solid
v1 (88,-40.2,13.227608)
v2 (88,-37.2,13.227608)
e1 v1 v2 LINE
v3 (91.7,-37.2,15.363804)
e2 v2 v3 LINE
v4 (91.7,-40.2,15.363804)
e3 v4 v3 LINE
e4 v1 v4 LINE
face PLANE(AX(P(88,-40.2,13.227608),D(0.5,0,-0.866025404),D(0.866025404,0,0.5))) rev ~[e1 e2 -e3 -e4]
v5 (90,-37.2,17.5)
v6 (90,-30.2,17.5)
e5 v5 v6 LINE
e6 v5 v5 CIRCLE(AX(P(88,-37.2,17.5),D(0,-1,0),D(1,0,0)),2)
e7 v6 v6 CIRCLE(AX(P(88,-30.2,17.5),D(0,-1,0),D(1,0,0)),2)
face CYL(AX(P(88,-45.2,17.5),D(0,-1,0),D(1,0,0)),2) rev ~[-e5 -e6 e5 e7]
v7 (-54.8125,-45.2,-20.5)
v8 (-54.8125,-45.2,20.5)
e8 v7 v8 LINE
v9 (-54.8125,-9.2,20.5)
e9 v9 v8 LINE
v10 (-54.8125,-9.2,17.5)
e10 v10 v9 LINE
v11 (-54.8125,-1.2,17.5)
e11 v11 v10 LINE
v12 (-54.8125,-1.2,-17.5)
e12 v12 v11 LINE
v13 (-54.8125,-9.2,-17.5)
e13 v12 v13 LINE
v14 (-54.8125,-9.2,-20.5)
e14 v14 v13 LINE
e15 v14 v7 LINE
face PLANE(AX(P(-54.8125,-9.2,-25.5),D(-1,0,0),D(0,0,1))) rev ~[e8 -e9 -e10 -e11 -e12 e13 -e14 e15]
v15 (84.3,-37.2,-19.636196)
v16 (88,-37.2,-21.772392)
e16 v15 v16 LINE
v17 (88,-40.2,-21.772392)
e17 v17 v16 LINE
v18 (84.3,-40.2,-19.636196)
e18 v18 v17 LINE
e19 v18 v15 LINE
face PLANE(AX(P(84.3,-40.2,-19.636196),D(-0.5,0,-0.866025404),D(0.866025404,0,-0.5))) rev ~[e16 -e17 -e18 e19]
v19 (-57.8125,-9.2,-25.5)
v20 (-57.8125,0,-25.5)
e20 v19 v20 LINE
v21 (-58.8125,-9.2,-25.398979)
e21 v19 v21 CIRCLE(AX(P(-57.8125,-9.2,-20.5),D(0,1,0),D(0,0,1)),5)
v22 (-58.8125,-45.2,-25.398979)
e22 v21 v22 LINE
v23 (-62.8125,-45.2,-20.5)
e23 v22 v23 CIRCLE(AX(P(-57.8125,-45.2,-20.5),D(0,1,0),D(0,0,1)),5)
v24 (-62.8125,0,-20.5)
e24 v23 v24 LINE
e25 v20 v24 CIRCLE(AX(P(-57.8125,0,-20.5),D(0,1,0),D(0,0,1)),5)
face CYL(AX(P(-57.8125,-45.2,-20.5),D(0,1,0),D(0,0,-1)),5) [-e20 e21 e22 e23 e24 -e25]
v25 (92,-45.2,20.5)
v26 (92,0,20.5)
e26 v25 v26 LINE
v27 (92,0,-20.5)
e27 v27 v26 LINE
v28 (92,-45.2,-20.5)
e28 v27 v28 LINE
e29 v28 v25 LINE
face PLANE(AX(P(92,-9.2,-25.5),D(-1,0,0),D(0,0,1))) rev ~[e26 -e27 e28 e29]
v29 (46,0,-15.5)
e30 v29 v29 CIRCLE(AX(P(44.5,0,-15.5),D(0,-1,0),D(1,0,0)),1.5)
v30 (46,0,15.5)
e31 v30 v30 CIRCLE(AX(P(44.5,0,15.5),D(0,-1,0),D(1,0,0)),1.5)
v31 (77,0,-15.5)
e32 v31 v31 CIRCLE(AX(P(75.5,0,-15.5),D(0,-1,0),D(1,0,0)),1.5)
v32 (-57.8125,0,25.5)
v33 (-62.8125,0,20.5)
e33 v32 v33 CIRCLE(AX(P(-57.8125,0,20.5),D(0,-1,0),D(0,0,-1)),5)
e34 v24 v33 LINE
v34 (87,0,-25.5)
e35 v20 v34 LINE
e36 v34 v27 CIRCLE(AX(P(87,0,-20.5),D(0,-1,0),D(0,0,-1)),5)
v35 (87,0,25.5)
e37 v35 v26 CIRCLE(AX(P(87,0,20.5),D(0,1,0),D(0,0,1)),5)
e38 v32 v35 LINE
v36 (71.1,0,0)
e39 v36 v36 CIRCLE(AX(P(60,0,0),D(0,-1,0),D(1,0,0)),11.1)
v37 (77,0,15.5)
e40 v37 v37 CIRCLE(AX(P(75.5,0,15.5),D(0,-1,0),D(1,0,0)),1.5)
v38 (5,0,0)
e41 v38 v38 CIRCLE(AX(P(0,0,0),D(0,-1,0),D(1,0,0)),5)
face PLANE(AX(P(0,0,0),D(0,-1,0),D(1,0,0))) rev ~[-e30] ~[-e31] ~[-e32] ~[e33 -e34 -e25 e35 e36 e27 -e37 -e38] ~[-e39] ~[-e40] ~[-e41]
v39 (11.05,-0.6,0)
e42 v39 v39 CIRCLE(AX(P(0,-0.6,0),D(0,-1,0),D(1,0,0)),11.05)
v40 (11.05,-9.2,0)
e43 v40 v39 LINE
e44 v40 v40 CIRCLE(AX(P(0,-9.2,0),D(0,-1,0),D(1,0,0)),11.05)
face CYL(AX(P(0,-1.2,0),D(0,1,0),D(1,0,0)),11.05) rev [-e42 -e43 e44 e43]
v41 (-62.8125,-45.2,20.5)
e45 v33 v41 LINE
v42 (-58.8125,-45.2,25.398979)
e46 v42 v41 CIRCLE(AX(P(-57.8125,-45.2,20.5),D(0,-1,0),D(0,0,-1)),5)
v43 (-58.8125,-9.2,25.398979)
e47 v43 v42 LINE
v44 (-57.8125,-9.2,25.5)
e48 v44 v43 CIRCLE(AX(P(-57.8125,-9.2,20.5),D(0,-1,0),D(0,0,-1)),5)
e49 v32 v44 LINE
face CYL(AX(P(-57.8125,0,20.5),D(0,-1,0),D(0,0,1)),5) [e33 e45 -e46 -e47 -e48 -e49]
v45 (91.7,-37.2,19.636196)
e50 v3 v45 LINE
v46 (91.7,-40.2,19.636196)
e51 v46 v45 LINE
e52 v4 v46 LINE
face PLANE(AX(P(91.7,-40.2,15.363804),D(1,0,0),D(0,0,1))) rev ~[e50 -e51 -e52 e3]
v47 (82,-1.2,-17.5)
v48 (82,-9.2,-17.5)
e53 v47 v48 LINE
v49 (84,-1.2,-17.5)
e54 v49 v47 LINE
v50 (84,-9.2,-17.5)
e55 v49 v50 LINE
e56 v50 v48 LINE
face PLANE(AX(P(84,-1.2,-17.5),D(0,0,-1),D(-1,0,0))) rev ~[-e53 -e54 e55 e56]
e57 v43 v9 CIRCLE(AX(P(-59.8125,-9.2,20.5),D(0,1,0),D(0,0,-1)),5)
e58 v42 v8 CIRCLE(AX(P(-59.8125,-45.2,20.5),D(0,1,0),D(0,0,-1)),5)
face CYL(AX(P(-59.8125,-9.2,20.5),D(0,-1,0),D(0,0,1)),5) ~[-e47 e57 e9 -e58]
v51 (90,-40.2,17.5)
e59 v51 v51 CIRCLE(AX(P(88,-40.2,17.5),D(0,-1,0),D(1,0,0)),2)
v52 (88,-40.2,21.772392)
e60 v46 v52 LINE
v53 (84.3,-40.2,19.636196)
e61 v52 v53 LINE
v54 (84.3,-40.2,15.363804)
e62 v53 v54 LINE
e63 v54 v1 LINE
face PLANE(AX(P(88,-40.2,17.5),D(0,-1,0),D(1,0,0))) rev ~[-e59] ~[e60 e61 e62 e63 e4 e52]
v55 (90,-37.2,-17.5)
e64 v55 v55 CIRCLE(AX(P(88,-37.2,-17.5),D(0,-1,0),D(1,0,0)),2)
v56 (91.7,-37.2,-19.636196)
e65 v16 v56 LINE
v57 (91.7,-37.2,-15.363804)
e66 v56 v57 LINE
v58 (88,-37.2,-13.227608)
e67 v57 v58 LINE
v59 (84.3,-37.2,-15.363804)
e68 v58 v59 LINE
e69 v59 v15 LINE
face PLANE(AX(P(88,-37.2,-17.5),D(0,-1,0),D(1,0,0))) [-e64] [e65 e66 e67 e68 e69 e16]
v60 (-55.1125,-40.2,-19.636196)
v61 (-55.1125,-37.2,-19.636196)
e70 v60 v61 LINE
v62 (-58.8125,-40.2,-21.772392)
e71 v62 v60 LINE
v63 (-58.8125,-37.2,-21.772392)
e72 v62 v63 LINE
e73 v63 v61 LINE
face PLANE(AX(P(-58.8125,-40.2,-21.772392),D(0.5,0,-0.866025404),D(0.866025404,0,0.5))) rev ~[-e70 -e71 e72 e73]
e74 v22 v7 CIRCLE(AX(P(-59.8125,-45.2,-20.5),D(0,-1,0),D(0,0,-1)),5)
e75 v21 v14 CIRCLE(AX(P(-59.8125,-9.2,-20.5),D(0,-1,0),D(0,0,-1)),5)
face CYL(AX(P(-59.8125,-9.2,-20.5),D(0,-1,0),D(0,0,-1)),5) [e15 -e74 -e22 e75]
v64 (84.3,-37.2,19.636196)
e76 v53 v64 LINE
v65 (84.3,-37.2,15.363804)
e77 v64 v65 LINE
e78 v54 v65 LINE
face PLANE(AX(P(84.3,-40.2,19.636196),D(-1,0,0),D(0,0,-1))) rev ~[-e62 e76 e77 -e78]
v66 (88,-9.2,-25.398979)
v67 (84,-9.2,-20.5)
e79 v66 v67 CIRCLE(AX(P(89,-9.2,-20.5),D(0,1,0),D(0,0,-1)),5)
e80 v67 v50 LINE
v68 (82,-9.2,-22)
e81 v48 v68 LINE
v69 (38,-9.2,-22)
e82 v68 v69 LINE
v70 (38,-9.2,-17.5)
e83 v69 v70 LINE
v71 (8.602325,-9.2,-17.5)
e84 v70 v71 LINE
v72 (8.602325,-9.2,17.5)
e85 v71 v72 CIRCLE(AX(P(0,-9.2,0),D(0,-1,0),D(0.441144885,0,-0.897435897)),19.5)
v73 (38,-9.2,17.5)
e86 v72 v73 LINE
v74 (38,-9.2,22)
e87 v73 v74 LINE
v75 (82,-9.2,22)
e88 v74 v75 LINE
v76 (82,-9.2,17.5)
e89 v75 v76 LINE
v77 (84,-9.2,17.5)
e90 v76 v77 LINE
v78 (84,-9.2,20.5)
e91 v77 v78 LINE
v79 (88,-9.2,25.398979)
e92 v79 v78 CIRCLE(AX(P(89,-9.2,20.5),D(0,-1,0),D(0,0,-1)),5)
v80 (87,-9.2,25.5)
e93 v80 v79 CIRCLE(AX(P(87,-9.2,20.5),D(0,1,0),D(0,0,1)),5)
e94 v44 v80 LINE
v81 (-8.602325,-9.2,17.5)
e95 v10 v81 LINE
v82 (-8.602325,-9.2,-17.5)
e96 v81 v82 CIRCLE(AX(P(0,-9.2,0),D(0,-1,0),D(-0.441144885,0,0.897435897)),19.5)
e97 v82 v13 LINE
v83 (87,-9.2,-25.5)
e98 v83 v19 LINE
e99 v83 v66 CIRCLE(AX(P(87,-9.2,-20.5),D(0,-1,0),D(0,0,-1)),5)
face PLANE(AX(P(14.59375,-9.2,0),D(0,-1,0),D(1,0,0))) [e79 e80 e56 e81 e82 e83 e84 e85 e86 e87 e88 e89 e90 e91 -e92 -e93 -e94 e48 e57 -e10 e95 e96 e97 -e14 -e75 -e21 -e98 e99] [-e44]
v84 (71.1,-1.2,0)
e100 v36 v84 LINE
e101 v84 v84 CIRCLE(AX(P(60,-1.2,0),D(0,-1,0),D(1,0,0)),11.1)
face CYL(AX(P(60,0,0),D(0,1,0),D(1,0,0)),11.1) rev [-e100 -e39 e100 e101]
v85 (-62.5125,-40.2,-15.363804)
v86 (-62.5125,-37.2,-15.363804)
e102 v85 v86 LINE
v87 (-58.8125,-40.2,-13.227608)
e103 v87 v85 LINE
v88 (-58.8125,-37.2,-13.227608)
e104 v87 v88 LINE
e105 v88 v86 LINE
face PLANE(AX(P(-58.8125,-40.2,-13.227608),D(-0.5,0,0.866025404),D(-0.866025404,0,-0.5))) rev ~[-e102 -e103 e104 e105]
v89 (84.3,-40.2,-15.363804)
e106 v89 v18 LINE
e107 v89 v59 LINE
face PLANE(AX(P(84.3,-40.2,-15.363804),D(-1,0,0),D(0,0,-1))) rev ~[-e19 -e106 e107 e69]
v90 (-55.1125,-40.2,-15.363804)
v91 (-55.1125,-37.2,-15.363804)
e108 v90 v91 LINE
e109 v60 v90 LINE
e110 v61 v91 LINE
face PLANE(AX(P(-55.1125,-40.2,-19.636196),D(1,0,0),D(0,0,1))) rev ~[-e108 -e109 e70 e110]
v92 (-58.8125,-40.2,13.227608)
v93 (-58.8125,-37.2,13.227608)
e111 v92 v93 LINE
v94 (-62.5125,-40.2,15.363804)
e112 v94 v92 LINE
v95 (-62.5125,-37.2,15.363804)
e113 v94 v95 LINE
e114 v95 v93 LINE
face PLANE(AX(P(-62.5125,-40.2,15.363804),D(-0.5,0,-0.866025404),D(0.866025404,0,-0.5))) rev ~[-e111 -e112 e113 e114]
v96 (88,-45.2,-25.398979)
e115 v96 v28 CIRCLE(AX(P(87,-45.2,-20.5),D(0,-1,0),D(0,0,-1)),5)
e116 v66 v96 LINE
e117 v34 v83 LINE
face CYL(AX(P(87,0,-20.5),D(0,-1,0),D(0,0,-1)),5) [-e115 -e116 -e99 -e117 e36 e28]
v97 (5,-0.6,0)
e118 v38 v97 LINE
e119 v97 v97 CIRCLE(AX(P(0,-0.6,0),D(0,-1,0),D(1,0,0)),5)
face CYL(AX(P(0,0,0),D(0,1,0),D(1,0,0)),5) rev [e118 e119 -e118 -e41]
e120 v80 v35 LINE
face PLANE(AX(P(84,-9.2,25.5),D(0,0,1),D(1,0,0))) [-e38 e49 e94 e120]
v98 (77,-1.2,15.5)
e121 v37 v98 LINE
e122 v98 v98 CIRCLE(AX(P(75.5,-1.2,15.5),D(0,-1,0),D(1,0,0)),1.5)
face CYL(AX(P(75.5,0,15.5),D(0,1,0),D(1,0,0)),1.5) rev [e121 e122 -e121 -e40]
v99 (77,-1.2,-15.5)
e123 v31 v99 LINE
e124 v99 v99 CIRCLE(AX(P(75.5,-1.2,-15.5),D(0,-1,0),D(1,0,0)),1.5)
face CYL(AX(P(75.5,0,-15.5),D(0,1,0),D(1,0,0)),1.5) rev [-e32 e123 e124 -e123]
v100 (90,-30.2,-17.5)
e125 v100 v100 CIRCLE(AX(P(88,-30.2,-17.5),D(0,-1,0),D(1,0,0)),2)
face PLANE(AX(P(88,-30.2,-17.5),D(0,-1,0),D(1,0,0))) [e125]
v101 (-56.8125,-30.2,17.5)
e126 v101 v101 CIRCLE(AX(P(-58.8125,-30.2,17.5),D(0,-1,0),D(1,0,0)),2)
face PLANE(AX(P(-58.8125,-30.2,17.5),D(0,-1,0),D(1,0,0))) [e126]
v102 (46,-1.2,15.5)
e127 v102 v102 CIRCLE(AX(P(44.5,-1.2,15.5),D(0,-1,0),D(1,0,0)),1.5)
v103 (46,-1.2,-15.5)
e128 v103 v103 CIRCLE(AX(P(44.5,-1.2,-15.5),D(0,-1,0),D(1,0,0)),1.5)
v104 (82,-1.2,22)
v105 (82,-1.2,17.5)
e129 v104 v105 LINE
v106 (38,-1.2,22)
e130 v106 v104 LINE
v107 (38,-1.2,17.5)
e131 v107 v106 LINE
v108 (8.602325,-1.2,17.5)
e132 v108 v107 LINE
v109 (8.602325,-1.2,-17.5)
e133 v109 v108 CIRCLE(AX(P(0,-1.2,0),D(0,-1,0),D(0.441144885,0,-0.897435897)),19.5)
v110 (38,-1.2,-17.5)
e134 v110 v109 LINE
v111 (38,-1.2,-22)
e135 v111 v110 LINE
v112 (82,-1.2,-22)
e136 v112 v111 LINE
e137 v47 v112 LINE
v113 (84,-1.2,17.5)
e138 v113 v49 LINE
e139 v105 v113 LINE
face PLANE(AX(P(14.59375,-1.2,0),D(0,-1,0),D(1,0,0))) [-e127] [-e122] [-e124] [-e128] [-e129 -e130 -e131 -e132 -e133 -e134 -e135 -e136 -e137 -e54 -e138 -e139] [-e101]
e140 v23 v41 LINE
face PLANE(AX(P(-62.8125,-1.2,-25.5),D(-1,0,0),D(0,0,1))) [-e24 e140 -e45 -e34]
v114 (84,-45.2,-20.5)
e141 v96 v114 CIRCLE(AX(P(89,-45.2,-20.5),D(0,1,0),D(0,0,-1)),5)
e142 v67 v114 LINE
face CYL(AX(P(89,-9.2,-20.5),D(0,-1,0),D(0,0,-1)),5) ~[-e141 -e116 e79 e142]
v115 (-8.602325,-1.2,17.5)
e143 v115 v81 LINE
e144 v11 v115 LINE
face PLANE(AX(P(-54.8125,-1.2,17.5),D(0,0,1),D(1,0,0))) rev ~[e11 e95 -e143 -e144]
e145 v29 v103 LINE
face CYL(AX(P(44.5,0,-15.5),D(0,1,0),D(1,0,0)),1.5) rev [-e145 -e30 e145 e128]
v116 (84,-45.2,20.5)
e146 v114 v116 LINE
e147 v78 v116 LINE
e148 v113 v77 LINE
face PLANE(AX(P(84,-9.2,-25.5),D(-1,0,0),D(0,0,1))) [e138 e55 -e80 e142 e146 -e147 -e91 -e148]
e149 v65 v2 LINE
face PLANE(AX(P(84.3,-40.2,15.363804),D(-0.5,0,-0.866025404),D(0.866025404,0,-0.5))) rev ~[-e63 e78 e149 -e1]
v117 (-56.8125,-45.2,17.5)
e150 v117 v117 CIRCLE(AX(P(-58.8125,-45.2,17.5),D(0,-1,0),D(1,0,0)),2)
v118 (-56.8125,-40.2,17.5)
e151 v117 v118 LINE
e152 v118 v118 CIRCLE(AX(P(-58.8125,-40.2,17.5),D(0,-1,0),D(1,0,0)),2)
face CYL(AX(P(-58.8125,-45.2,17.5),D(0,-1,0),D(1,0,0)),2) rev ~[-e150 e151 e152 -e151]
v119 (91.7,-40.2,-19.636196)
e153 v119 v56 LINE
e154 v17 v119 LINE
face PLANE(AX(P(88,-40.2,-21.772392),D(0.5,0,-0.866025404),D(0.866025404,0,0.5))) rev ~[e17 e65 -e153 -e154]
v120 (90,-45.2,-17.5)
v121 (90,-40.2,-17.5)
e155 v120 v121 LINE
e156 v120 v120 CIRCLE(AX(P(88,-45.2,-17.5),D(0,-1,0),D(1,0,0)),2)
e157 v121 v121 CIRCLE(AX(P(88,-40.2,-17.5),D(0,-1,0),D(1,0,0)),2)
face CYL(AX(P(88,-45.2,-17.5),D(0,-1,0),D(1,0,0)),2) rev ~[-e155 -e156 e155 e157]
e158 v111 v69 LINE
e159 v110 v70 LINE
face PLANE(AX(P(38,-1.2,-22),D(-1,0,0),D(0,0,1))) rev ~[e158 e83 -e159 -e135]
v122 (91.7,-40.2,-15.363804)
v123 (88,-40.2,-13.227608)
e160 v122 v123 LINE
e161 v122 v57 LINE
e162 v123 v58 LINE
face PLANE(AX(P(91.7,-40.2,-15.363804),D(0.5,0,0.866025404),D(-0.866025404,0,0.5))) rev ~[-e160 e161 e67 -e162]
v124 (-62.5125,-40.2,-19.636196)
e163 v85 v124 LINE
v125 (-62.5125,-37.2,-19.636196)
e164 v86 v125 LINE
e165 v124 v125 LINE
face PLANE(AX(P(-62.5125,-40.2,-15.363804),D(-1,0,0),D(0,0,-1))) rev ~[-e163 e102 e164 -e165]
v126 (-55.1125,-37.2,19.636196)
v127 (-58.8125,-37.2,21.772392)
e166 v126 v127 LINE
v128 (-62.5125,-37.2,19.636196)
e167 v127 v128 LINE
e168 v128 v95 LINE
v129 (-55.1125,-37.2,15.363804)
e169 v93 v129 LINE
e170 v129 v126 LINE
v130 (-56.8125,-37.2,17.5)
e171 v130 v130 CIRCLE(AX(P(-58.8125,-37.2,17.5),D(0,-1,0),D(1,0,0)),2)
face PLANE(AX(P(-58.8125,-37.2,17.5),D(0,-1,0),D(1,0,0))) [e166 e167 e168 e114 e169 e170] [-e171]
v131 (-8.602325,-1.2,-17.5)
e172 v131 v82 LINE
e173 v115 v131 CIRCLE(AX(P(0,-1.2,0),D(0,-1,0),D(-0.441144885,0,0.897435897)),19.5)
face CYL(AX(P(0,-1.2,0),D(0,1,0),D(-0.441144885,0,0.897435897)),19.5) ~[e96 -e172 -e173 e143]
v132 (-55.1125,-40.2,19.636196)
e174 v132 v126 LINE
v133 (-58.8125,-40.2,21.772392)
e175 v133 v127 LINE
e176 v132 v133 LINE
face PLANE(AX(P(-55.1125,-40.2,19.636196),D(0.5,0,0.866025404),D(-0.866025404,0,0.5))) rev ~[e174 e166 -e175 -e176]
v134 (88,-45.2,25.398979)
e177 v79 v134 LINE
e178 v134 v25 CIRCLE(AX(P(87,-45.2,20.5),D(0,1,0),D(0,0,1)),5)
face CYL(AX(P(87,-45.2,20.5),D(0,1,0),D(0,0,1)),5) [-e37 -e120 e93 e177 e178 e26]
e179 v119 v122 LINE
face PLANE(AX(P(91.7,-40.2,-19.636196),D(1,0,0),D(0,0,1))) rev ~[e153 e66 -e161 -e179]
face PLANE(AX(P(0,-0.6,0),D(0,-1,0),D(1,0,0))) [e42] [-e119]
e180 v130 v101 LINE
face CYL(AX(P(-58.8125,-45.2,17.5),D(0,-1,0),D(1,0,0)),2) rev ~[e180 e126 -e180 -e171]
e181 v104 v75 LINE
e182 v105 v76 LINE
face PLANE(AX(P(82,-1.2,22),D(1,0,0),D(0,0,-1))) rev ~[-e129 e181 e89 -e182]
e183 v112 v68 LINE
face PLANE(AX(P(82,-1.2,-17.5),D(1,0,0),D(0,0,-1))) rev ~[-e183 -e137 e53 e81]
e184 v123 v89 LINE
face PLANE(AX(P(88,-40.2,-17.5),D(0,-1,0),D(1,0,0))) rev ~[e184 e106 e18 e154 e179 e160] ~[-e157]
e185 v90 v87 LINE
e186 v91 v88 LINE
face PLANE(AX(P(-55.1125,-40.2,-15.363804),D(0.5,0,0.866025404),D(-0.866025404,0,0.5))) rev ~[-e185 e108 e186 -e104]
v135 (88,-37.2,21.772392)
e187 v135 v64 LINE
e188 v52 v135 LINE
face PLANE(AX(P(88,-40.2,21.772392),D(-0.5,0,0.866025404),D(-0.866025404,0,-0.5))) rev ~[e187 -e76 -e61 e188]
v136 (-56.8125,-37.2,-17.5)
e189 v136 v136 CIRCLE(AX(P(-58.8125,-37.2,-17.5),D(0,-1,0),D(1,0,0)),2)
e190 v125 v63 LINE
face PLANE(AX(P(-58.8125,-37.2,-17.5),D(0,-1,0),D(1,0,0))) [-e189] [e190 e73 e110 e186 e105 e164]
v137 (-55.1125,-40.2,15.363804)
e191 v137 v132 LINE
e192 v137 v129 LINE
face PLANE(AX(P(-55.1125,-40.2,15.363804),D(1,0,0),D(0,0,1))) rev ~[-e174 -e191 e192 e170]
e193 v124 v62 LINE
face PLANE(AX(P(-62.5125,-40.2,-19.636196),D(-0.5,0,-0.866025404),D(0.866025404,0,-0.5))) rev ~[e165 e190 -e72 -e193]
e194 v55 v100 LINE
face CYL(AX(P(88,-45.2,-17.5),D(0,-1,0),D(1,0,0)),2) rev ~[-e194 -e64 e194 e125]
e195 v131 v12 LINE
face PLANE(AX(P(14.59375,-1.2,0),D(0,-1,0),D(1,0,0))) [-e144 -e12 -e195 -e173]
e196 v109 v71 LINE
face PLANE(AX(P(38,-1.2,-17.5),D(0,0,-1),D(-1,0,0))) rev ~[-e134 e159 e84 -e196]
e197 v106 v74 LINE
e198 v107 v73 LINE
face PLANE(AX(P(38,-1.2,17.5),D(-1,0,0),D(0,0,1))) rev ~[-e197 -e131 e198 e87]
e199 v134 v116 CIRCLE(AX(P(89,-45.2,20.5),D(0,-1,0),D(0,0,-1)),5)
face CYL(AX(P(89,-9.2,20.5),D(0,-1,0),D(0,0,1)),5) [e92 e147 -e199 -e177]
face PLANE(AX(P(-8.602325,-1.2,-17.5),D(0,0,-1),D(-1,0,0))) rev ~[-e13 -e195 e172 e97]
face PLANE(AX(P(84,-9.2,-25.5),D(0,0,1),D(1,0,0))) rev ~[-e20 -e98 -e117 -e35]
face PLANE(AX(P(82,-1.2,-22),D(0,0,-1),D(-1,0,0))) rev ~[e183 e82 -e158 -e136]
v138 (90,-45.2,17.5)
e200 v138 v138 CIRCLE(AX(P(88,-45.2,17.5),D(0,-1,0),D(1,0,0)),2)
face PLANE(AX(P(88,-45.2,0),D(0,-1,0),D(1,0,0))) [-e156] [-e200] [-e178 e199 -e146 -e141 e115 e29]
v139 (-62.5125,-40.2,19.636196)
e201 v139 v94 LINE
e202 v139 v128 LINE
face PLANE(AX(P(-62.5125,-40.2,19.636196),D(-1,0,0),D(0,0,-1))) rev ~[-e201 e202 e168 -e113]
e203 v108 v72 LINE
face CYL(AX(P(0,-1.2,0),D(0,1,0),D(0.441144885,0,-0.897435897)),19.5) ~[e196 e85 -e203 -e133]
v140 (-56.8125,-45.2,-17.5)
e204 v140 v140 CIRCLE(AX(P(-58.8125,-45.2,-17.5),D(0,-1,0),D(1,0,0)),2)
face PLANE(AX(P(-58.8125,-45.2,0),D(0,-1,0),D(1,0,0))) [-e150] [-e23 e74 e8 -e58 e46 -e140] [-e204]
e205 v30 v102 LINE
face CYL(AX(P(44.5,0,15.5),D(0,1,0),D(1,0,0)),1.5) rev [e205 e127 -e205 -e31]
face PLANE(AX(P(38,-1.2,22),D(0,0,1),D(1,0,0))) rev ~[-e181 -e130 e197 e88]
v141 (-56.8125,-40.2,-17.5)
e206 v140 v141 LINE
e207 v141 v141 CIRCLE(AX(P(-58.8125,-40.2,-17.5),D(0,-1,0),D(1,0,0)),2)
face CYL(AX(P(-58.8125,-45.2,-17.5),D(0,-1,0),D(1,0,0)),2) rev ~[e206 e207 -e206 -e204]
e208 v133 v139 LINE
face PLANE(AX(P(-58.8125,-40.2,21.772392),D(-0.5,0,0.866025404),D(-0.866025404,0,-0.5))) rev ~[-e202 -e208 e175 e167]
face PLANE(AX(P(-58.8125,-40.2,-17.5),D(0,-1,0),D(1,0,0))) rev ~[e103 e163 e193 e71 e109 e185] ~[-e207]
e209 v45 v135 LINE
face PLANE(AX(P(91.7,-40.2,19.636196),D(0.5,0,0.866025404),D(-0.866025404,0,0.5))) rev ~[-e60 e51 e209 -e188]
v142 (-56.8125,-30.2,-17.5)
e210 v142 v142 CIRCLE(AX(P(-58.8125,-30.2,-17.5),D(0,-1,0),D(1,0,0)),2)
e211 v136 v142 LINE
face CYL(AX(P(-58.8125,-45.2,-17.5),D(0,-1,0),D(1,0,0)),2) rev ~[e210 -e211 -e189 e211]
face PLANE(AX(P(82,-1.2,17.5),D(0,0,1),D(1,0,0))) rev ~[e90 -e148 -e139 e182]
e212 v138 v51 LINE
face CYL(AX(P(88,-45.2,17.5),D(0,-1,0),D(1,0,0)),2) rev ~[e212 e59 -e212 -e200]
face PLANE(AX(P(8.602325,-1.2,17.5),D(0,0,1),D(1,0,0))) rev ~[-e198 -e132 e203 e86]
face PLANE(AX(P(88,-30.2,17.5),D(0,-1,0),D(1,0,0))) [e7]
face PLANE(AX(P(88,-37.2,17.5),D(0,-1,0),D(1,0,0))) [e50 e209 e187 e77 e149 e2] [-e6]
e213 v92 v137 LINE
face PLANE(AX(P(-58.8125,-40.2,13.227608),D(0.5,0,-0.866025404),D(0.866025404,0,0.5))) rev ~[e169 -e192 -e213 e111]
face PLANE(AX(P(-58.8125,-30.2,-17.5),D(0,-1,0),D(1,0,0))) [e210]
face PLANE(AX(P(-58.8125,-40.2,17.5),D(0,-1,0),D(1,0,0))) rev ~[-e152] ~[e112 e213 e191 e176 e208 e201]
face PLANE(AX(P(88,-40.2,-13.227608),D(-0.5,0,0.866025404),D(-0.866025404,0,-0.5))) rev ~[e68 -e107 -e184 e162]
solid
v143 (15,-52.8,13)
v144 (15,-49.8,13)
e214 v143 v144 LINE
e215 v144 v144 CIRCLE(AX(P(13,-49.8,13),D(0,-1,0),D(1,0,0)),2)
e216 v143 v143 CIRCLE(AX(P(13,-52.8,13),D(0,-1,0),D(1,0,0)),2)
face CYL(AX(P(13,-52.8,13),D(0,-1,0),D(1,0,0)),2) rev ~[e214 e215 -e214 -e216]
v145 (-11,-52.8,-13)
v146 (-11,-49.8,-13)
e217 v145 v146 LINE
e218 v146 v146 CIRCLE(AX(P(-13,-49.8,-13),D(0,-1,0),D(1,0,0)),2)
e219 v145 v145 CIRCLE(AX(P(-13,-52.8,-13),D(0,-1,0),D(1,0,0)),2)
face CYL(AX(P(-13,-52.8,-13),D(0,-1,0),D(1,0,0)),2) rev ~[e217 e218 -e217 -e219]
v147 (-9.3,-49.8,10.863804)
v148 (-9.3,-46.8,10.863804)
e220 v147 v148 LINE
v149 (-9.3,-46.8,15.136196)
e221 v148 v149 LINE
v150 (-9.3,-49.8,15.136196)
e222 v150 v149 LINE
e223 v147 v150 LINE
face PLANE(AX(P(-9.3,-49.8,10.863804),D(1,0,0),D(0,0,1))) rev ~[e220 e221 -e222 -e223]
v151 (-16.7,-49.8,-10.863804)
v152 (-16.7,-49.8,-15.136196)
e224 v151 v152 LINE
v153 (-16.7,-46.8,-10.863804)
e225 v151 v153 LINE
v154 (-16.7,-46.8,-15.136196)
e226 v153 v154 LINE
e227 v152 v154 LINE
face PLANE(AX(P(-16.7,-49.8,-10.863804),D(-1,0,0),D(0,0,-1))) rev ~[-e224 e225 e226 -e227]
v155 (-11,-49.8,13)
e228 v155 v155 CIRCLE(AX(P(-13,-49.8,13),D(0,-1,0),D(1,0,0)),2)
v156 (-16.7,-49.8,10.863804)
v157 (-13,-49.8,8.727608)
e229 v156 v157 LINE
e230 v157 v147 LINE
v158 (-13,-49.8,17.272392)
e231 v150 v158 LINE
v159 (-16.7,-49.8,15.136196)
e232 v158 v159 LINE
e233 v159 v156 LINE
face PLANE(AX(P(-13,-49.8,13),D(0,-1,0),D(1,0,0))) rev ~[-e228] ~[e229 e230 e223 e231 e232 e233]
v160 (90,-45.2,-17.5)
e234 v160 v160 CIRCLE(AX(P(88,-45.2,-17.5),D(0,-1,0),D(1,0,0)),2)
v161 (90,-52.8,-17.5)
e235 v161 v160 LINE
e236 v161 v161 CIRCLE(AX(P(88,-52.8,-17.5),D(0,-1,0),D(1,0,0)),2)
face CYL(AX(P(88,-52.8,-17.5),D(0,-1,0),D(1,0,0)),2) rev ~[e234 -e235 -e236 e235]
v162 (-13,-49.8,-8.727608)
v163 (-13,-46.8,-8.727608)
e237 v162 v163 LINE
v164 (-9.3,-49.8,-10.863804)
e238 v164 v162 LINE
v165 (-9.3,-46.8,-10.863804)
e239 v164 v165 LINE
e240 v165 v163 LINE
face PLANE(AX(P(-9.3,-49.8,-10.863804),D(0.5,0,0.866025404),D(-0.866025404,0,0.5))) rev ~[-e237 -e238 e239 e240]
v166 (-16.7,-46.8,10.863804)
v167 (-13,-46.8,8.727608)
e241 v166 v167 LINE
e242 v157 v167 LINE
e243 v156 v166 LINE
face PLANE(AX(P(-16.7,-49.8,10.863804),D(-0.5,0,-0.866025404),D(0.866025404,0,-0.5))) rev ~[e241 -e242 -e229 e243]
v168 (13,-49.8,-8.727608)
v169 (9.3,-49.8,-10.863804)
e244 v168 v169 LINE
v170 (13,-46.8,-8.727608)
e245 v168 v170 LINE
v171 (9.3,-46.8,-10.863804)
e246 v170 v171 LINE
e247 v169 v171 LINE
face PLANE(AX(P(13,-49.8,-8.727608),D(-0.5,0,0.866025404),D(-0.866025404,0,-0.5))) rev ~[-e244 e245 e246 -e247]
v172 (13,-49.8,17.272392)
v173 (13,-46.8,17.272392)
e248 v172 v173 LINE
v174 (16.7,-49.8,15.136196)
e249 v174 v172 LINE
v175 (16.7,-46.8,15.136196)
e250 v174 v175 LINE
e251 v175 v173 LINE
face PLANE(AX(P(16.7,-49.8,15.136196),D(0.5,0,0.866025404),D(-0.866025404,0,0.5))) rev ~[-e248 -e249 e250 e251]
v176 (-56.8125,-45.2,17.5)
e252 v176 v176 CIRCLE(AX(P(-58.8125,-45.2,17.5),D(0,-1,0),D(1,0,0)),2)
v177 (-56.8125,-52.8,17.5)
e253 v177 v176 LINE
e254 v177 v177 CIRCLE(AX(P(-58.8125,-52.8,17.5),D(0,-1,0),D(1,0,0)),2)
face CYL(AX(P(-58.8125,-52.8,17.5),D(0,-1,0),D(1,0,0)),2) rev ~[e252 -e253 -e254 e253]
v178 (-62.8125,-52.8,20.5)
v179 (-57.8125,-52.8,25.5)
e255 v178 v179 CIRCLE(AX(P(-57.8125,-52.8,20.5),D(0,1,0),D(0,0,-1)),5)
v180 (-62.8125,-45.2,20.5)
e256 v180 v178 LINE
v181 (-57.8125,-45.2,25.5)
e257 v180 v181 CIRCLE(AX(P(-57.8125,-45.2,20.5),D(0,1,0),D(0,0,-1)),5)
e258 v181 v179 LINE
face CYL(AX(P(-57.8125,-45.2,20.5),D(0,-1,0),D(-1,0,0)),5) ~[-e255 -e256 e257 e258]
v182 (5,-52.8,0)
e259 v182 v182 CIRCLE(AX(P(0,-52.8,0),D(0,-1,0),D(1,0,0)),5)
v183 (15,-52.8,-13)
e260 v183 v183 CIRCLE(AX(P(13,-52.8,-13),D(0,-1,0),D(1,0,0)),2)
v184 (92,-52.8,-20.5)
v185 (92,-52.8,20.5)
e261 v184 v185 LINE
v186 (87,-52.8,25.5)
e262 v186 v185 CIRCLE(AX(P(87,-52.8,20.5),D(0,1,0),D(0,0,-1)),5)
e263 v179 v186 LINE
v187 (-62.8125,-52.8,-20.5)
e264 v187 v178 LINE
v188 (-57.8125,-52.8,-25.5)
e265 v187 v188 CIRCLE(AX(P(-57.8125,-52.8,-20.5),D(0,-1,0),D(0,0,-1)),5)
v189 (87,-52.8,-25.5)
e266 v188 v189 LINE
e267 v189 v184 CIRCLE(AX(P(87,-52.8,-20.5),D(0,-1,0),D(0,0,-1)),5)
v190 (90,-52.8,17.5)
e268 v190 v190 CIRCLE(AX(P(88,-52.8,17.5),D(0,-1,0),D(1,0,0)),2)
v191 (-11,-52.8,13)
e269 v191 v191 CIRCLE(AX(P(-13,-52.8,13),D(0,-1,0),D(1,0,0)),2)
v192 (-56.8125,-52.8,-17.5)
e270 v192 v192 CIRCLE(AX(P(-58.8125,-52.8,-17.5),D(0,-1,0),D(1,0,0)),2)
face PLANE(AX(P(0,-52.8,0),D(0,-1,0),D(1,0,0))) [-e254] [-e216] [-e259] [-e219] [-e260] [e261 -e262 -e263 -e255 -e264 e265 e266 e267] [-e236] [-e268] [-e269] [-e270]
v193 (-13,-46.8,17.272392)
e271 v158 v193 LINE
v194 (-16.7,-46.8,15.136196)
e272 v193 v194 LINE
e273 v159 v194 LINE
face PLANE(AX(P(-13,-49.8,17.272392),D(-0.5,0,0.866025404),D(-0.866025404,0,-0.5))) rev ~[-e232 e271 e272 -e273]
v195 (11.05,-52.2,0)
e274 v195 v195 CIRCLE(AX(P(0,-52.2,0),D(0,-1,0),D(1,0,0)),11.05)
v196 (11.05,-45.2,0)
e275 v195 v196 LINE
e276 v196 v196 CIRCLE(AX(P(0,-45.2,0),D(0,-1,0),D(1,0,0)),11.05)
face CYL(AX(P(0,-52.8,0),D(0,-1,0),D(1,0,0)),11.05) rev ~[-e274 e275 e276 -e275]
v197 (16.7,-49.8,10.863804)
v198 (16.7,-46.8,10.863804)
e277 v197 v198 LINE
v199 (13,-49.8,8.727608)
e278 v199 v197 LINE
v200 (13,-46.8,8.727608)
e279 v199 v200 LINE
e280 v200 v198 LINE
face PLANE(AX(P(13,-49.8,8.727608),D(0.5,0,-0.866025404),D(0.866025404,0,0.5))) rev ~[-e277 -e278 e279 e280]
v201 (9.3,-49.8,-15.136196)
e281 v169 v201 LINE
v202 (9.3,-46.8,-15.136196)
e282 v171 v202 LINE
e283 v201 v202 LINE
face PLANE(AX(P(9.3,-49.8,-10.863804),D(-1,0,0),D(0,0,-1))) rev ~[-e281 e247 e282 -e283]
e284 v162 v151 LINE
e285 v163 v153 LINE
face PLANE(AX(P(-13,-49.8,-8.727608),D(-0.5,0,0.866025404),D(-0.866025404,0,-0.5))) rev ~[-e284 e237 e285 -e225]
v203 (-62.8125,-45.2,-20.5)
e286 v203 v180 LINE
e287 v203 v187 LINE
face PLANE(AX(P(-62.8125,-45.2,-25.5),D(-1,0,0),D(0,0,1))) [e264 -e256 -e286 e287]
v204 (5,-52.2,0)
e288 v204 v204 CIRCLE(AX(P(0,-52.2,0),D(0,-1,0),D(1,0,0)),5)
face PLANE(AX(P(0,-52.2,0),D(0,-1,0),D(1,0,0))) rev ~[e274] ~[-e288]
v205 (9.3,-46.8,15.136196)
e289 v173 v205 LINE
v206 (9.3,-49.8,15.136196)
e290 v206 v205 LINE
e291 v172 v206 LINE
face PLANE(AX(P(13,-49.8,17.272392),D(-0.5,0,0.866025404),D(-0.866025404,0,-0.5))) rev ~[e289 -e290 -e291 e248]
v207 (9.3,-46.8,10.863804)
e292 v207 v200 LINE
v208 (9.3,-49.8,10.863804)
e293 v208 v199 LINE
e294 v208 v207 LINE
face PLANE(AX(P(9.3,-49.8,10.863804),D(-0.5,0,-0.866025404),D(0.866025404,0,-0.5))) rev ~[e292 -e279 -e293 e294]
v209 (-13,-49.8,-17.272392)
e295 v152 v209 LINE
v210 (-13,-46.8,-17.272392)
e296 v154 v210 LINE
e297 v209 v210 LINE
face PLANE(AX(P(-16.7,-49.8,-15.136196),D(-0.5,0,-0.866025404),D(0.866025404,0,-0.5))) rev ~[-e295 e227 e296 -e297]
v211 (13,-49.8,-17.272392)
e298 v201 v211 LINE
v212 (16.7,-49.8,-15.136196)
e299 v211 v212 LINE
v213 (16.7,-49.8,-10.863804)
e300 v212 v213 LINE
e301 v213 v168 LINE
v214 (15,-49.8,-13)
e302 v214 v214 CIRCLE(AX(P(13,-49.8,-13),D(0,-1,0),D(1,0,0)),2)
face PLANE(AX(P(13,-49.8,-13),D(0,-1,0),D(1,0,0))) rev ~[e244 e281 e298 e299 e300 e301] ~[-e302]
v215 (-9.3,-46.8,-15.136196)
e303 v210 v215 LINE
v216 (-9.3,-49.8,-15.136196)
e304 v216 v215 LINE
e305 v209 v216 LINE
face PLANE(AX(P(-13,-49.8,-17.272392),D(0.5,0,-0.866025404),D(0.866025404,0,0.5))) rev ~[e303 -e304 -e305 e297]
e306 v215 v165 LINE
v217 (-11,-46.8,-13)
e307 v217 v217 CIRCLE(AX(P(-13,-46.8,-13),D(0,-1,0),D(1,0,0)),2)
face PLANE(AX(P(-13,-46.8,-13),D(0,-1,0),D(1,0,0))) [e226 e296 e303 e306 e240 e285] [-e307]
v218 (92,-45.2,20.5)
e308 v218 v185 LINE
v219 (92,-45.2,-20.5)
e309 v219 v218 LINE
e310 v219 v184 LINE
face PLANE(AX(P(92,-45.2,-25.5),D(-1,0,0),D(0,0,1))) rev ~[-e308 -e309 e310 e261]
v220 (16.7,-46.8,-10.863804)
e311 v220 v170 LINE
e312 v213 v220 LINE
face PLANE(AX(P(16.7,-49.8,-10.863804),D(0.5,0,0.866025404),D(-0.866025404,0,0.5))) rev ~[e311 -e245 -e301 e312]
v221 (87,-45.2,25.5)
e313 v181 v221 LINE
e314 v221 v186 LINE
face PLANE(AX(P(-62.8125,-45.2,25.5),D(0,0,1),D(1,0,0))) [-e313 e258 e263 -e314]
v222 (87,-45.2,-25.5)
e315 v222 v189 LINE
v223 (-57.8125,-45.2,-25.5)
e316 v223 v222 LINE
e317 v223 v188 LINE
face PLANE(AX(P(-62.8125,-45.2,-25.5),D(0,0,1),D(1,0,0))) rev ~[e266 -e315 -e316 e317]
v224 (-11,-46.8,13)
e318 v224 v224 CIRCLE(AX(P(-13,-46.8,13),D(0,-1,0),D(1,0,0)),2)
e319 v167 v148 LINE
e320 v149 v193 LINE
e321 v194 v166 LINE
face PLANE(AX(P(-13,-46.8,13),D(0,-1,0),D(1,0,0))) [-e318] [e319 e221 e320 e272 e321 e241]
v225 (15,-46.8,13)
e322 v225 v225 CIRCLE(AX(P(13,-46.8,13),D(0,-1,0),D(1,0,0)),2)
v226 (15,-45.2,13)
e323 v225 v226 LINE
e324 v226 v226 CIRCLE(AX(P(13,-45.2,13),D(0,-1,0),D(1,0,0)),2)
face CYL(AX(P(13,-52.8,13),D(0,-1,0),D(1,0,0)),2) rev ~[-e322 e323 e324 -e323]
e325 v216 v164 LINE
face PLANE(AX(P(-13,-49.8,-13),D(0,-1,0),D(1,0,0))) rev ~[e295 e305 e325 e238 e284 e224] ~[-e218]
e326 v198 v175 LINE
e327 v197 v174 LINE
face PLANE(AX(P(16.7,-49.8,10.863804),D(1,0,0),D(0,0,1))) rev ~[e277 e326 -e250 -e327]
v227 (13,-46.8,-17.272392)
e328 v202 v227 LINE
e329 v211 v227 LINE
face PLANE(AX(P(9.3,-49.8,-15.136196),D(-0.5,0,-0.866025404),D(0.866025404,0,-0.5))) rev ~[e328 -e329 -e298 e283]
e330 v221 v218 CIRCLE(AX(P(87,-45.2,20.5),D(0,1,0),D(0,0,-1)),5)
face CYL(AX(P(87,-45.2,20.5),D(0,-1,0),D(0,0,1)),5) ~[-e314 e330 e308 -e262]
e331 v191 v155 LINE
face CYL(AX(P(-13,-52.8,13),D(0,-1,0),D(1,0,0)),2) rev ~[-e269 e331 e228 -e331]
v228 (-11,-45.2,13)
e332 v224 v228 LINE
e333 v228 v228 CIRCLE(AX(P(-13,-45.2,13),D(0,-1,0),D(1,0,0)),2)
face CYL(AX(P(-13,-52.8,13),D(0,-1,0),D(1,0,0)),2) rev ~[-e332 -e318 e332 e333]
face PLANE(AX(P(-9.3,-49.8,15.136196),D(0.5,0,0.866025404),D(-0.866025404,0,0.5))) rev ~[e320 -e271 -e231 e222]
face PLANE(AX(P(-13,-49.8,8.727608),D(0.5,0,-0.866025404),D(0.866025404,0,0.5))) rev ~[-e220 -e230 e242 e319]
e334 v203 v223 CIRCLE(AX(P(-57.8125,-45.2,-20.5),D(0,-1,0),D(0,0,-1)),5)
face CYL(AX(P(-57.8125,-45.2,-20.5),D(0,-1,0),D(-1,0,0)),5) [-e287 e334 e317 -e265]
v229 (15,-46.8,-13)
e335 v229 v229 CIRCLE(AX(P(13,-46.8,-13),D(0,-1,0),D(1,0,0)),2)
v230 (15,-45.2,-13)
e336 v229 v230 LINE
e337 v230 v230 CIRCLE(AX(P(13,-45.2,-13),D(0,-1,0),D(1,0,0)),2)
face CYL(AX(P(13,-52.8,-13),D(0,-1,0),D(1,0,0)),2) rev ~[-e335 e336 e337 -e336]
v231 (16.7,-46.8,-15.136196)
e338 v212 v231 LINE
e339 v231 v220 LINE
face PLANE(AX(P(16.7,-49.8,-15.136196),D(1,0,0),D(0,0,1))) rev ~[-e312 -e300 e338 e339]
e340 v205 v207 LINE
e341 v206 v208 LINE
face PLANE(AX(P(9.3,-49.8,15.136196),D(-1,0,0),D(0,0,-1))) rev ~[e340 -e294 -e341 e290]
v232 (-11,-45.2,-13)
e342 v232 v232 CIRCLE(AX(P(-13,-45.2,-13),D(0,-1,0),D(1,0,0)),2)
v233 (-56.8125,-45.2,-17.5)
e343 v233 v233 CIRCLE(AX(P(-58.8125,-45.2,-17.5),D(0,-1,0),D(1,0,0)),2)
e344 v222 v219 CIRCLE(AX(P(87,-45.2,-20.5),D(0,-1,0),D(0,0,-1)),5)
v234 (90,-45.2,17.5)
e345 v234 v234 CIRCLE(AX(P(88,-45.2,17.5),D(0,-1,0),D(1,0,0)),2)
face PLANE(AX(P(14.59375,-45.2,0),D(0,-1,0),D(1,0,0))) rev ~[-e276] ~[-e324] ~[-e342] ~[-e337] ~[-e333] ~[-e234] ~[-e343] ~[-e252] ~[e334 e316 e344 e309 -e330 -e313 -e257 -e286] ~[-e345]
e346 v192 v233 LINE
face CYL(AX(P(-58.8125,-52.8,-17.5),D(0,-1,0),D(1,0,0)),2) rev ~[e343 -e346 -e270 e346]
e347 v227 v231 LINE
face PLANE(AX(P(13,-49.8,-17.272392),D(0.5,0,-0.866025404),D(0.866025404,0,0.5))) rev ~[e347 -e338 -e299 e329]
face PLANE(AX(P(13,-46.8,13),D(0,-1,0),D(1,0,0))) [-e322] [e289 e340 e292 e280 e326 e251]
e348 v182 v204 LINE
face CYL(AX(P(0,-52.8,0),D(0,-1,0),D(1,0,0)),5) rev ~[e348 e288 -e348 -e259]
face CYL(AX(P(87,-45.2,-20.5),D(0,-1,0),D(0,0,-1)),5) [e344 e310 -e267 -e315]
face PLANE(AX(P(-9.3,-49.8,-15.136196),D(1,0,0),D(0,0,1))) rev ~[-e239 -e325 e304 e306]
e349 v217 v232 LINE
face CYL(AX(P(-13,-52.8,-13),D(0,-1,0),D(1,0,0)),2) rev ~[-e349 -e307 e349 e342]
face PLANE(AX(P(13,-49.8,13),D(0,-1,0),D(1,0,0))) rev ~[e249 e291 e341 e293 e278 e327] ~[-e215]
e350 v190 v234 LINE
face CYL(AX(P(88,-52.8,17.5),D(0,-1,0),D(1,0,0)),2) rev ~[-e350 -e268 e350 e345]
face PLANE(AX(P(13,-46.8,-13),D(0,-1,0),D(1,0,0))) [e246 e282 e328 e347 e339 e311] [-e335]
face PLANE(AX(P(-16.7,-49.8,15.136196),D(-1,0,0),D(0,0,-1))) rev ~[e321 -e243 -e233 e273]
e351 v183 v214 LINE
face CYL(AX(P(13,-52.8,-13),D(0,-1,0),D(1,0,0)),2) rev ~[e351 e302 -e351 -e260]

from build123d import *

# Parameters (mm, degrees)
F0_W       = 154.8125
F0_H       = 51
F0_R       = 1.5
F0_R_2     = 11.05
F0_R_3     = 11.1
F1_DEPTH   = 1.2
F2_W       = 154.8125
F2_H       = 51
F2_R       = 11.05
F3_DEPTH   = 8
F4_W       = 8
F4_H       = 51
F5_DEPTH   = 36
F6_W       = 154.8125
F6_H       = 51
F7_DEPTH   = 7.6
F0_R_4     = 5
F8_DEPTH   = 0.6
F9_R       = 11.05
F9_R_2     = 5
F9_R_3     = 2
F10_DEPTH  = 52.801
F11_DEPTH  = 0.6
F14_DEPTH  = 3
F15_R      = 2
F16_DEPTH  = 15
F19_DEPTH  = 3
F20_R      = 2
F21_DEPTH  = 52.801
F22_F1_R   = 5
F22_F2_R   = 5
F22_F3_R   = 5
F22_F4_R   = 5
F22_F5_R   = 5
F22_F6_R   = 5
F22_F7_R   = 5
F22_F8_R   = 5
F22_2_F1_R = 5
F22_2_F2_R = 5
F22_2_F3_R = 5
F22_2_F4_R = 5


with BuildPart() as f1:
    # F0 (on Front) → F1 (new body)
    with BuildSketch(Plane.XZ):
        with Locations((14.59375, 0)):
            Rectangle(F0_W, F0_H)
        with Locations((44.5, -15.5)):
            Circle(F0_R, mode=Mode.SUBTRACT)
        with Locations((75.5, -15.5)):
            Circle(F0_R, mode=Mode.SUBTRACT)
        Circle(F0_R_2, mode=Mode.SUBTRACT)
        with Locations((60, 0)):
            Circle(F0_R_3, mode=Mode.SUBTRACT)
        with Locations((44.5, 15.5)):
            Circle(F0_R, mode=Mode.SUBTRACT)
        with Locations((75.5, 15.5)):
            Circle(F0_R, mode=Mode.SUBTRACT)
    extrude(amount=F1_DEPTH)

    # F2 (on face) → F3 (join)
    with BuildSketch(Plane.XZ.offset(1.2)):
        with Locations((14.59375, 0)):
            Rectangle(F2_W, F2_H)
        with BuildLine():
            Line((-8.602325267, -17.5), (-54.8125, -17.5))
            Line((-54.8125, -17.5), (-54.8125, 17.5))
            Line((-54.8125, 17.5), (-8.602325267, 17.5))
            ThreePointArc((-8.602325267, 17.5), (-19.5, 0), (-8.602325267, -17.5))
        make_face(mode=Mode.SUBTRACT)
        Circle(F2_R, mode=Mode.SUBTRACT)
        with BuildLine():
            Line((82, 17.5), (84, 17.5))
            Line((84, 17.5), (84, -17.5))
            Line((84, -17.5), (82, -17.5))
            Line((82, -17.5), (82, -22))
            Line((82, -22), (38, -22))
            Line((38, -22), (38, -17.5))
            Line((38, -17.5), (8.602325267, -17.5))
            ThreePointArc((8.602325267, -17.5), (19.5, 0), (8.602325267, 17.5))
            Line((8.602325267, 17.5), (38, 17.5))
            Line((38, 17.5), (38, 22))
            Line((38, 22), (82, 22))
            Line((82, 22), (82, 17.5))
        make_face(mode=Mode.SUBTRACT)
    extrude(amount=F3_DEPTH)

    # F4 (on face) → F5 (join)
    with BuildSketch(Plane.XZ.offset(9.2)):
        with Locations((88, 0)):
            Rectangle(F4_W, F4_H)
        with Locations((-58.8125, 0)):
            Rectangle(F4_W, F4_H)
    extrude(amount=F5_DEPTH)

    # F0 (on Front) → F8 (join)
    with BuildSketch(Plane.XZ):
        Circle(F0_R_2)
        Circle(F0_R_4, mode=Mode.SUBTRACT)
    extrude(amount=F8_DEPTH)

    # F15 (on face) → F16 (cut)
    with BuildSketch(Plane.XZ.offset(45.2)):
        with Locations((88, 17.5)):
            Circle(F15_R)
        with Locations((88, -17.5)):
            Circle(F15_R)
        with Locations((-58.8125, 17.5)):
            Circle(F15_R)
        with Locations((-58.8125, -17.5)):
            Circle(F15_R)
    extrude(amount=-F16_DEPTH, mode=Mode.SUBTRACT)

    # F18 (on offset) → F19 (cut)
    with BuildSketch(Plane.XZ.offset(40.2)):
        Polygon((-55.1125, 15.363804004), (-55.1125, 19.636195996), (-58.8125, 21.772391992), (-62.5125, 19.636195996), (-62.5125, 15.363804004), (-58.8125, 13.227608008), align=None)
        Polygon((-55.1125, -19.636195996), (-55.1125, -15.363804004), (-58.8125, -13.227608008), (-62.5125, -15.363804004), (-62.5125, -19.636195996), (-58.8125, -21.772391992), align=None)
        Polygon((84.3, 19.636195996), (84.3, 15.363804004), (88, 13.227608008), (91.7, 15.363804004), (91.7, 19.636195996), (88, 21.772391992), align=None)
        Polygon((84.3, -15.363804004), (84.3, -19.636195996), (88, -21.772391992), (91.7, -19.636195996), (91.7, -15.363804004), (88, -13.227608008), align=None)
    extrude(amount=-F19_DEPTH, mode=Mode.SUBTRACT)

    # F22: fillet of radius 5 on 8 edges, made by hand

    # F22_f1
    f22_f1_edges = [f1.edges().sort_by_distance(p)[0] for p in [
        (84, -27.2, 25.5),
    ]]
    fillet(f22_f1_edges, radius=F22_F1_R)

    # F22_f2
    f22_f2_edges = [f1.edges().sort_by_distance(p)[0] for p in [
        (-54.8125, -27.2, 25.5),
    ]]
    fillet(f22_f2_edges, radius=F22_F2_R)

    # F22_f3
    f22_f3_edges = [f1.edges().sort_by_distance(p)[0] for p in [
        (84, -27.2, -25.5),
    ]]
    fillet(f22_f3_edges, radius=F22_F3_R)

    # F22_f4
    f22_f4_edges = [f1.edges().sort_by_distance(p)[0] for p in [
        (-54.8125, -27.2, -25.5),
    ]]
    fillet(f22_f4_edges, radius=F22_F4_R)

    # F22_f5
    f22_f5_edges = [f1.edges().sort_by_distance(p)[0] for p in [
        (92, -22.6, 25.5),
    ]]
    fillet(f22_f5_edges, radius=F22_F5_R)

    # F22_f6
    f22_f6_edges = [f1.edges().sort_by_distance(p)[0] for p in [
        (-62.8125, -22.6, 25.5),
    ]]
    fillet(f22_f6_edges, radius=F22_F6_R)

    # F22_f7
    f22_f7_edges = [f1.edges().sort_by_distance(p)[0] for p in [
        (92, -22.6, -25.5),
    ]]
    fillet(f22_f7_edges, radius=F22_F7_R)

    # F22_f8
    f22_f8_edges = [f1.edges().sort_by_distance(p)[0] for p in [
        (-62.8125, -22.6, -25.5),
    ]]
    fillet(f22_f8_edges, radius=F22_F8_R)


with BuildPart() as f7:
    # F6 (on face) → F7 (new body)
    with BuildSketch(Plane.XZ.offset(45.2)):
        with Locations((14.59375, 0)):
            Rectangle(F6_W, F6_H)
    extrude(amount=F7_DEPTH)

    # F9 (on face) → F10 (cut, through all)
    with BuildSketch(Plane.XZ.offset(52.8)):
        Circle(F9_R)
        Circle(F9_R_2, mode=Mode.SUBTRACT)
        with Locations((-13, -13)):
            Circle(F9_R_3)
        with Locations((13, -13)):
            Circle(F9_R_3)
        with Locations((13, 13)):
            Circle(F9_R_3)
        with Locations((-13, 13)):
            Circle(F9_R_3)
        Circle(F9_R_2)
    extrude(amount=-F10_DEPTH, mode=Mode.SUBTRACT)

    # F9 (on face) → F11 (join)
    with BuildSketch(Plane.XZ.offset(52.8)):
        Circle(F9_R)
        Circle(F9_R_2, mode=Mode.SUBTRACT)
    extrude(amount=-F11_DEPTH)

    # F13 (on offset) → F14 (cut)
    with BuildSketch(Plane.XZ.offset(49.8)):
        Polygon((-9.3, -15.136195996), (-9.3, -10.863804004), (-13, -8.727608008), (-16.7, -10.863804004), (-16.7, -15.136195996), (-13, -17.272391992), align=None)
        Polygon((-9.3, 10.863804004), (-9.3, 15.136195996), (-13, 17.272391992), (-16.7, 15.136195996), (-16.7, 10.863804004), (-13, 8.727608008), align=None)
        Polygon((9.3, 15.136195996), (9.3, 10.863804004), (13, 8.727608008), (16.7, 10.863804004), (16.7, 15.136195996), (13, 17.272391992), align=None)
        Polygon((9.3, -10.863804004), (9.3, -15.136195996), (13, -17.272391992), (16.7, -15.136195996), (16.7, -10.863804004), (13, -8.727608008), align=None)
    extrude(amount=-F14_DEPTH, mode=Mode.SUBTRACT)

    # F20 (on face) → F21 (cut, through all)
    with BuildSketch(Plane.XZ.offset(52.8)):
        with Locations((-58.8125, -17.5)):
            Circle(F20_R)
        with Locations((-58.8125, 17.5)):
            Circle(F20_R)
        with Locations((88, 17.5)):
            Circle(F20_R)
        with Locations((88, -17.5)):
            Circle(F20_R)
    extrude(amount=-F21_DEPTH, mode=Mode.SUBTRACT)

    # F22#2: fillet of radius 5 on 4 edges, made by hand

    # F22_2_f1
    f22_2_f1_edges = [f7.edges().sort_by_distance(p)[0] for p in [
        (-62.8125, -49, -25.5),
    ]]
    fillet(f22_2_f1_edges, radius=F22_2_F1_R)

    # F22_2_f2
    f22_2_f2_edges = [f7.edges().sort_by_distance(p)[0] for p in [
        (92, -49, -25.5),
    ]]
    fillet(f22_2_f2_edges, radius=F22_2_F2_R)

    # F22_2_f3
    f22_2_f3_edges = [f7.edges().sort_by_distance(p)[0] for p in [
        (-62.8125, -49, 25.5),
    ]]
    fillet(f22_2_f3_edges, radius=F22_2_F3_R)

    # F22_2_f4
    f22_2_f4_edges = [f7.edges().sort_by_distance(p)[0] for p in [
        (92, -49, 25.5),
    ]]
    fillet(f22_2_f4_edges, radius=F22_2_F4_R)


solid = Compound([f1.part, f7.part])
